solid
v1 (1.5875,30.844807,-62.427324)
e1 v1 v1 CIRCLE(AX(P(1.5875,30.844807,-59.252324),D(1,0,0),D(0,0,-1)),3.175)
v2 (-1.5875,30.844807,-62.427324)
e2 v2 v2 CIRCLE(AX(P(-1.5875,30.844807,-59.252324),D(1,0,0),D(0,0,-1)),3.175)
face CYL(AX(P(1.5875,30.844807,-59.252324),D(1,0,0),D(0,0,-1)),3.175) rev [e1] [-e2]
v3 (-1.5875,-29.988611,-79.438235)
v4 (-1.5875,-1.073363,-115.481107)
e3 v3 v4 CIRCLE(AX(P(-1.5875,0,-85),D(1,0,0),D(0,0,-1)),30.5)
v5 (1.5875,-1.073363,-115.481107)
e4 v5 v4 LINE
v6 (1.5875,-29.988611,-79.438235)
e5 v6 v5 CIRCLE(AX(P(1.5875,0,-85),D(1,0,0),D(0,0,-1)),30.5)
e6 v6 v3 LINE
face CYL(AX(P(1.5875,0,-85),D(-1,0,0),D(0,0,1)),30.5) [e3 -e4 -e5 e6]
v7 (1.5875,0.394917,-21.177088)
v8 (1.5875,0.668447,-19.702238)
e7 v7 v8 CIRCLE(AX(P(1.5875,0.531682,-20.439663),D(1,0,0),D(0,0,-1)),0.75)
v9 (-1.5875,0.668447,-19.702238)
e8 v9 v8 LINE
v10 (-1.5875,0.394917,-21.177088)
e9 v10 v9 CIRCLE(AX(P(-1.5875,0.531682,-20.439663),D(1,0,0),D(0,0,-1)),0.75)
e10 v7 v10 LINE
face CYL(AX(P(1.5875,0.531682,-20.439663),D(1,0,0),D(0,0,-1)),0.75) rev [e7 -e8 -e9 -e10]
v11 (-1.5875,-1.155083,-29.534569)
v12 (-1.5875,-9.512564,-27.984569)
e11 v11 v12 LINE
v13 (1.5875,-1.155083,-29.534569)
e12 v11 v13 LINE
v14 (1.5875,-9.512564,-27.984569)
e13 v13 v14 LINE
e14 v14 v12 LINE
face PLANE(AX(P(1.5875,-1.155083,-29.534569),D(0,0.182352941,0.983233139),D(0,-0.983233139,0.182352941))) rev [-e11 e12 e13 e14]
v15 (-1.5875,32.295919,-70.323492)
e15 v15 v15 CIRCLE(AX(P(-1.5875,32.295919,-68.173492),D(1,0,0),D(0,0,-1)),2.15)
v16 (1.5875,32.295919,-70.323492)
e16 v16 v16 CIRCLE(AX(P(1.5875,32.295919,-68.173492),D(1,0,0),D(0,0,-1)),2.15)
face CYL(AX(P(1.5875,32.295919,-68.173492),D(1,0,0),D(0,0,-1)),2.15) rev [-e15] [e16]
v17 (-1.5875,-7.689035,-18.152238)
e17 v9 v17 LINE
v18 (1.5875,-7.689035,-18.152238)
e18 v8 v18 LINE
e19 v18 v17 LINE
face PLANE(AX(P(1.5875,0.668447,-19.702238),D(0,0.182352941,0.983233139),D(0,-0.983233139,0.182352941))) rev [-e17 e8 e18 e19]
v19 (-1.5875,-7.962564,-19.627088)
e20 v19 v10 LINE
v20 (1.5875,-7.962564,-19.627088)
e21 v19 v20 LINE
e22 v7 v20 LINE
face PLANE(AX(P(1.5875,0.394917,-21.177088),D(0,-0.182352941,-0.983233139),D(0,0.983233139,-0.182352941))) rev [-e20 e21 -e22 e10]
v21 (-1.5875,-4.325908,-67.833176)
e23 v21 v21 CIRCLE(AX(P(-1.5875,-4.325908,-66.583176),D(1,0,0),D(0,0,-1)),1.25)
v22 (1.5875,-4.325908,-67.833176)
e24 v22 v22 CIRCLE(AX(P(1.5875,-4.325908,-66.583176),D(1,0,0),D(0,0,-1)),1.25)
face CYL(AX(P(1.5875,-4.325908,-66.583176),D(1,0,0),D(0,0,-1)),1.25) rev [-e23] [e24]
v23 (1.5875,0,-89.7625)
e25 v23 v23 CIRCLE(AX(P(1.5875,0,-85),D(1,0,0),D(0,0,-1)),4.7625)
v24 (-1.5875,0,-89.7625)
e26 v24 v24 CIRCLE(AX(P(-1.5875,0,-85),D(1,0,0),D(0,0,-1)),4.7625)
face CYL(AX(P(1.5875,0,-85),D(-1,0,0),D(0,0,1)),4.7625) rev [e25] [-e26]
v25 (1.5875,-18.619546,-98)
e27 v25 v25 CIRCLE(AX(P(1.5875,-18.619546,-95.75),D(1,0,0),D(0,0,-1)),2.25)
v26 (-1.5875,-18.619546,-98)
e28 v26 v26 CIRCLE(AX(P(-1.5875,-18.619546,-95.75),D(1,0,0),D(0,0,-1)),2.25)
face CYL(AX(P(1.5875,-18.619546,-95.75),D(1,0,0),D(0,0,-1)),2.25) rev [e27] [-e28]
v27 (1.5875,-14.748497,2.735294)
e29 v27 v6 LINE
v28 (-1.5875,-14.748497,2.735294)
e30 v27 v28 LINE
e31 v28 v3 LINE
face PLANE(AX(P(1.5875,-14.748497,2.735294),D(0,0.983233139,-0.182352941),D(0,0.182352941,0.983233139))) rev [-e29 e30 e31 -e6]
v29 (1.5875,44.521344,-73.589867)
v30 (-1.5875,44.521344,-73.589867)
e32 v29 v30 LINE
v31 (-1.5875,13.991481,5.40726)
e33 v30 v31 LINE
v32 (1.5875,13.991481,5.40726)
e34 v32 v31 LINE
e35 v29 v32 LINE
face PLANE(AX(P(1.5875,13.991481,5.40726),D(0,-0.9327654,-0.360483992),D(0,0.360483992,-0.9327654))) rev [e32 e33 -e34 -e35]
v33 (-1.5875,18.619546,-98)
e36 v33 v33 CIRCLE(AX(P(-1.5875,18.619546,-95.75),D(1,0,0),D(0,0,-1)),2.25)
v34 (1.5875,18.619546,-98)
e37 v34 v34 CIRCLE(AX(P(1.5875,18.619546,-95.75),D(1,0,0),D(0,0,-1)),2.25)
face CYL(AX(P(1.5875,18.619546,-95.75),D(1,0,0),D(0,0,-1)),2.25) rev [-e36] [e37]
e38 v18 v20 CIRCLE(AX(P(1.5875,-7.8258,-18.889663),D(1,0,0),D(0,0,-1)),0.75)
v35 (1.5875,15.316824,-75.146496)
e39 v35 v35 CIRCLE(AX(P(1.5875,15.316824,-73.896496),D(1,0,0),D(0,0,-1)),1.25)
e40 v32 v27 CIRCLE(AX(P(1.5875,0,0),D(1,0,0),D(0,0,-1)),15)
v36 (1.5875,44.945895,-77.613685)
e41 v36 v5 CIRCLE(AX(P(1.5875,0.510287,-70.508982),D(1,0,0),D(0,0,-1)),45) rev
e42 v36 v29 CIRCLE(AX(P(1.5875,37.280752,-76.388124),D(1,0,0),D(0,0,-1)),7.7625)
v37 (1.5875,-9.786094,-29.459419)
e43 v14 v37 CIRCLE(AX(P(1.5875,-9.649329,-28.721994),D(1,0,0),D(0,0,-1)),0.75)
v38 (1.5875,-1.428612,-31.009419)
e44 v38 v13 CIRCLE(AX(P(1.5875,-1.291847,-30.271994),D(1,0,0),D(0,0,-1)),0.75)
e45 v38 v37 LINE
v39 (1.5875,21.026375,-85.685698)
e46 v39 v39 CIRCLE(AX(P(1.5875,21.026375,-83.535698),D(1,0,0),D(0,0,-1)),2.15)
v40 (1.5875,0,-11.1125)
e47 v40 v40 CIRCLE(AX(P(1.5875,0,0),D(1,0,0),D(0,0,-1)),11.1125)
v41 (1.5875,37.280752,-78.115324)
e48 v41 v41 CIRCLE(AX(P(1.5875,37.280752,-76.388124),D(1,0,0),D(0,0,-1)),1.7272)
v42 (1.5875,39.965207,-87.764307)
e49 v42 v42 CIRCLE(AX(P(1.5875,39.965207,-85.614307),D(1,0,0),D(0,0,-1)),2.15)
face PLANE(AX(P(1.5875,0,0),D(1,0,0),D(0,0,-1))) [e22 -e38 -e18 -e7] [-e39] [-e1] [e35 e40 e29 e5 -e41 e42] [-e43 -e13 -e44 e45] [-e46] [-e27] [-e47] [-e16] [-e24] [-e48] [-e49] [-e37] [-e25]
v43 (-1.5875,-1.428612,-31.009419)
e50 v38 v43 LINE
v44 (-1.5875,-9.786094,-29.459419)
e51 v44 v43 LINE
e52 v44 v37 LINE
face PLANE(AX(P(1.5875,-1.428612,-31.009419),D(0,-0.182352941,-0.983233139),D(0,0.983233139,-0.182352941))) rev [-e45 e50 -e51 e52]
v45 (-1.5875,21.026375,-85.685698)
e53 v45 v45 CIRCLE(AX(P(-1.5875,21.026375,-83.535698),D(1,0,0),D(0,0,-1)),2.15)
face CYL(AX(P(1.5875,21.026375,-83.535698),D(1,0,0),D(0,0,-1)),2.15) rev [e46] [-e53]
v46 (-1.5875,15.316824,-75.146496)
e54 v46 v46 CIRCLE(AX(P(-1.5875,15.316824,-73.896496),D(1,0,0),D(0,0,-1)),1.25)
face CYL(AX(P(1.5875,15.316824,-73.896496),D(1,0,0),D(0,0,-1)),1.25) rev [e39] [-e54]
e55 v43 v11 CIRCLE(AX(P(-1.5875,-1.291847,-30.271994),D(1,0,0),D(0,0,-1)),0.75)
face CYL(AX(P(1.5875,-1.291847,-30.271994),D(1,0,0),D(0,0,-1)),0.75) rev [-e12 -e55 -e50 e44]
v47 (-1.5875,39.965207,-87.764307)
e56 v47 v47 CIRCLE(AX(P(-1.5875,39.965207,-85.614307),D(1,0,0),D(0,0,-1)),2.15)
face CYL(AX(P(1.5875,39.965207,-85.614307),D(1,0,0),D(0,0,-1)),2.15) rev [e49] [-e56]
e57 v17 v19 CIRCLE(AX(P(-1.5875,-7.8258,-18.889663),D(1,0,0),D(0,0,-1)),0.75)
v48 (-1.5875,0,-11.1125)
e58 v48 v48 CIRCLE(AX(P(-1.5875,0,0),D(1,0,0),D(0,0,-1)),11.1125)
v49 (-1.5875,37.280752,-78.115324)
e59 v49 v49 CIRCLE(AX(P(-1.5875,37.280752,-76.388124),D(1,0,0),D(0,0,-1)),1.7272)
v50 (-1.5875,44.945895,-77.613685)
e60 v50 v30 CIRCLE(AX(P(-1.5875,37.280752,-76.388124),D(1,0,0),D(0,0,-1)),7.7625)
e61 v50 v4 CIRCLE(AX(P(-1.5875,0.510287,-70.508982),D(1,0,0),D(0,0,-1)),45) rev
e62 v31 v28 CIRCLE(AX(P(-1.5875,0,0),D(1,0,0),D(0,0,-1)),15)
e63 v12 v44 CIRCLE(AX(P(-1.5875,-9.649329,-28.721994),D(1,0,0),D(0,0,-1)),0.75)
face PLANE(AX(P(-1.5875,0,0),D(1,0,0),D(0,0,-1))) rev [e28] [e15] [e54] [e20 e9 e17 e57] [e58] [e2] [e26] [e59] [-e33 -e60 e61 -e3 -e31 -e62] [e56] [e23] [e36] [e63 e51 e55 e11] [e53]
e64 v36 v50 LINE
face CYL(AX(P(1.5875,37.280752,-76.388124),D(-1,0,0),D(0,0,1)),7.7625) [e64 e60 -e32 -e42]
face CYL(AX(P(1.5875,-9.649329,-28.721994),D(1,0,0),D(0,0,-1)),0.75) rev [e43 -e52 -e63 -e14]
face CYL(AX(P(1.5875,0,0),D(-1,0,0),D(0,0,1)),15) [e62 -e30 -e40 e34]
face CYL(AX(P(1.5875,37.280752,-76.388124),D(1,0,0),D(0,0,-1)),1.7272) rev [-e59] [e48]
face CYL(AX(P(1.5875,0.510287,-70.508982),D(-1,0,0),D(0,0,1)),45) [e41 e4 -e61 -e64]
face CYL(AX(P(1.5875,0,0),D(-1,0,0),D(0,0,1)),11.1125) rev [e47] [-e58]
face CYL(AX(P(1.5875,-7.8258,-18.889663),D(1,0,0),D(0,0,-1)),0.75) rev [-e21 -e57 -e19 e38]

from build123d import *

# Parameters (mm, degrees)
SKETCH1_R                  = 11.1125
SKETCH1_R_2                = 4.7625
BOSS_EXTRUDE1_DEPTH        = 1.5875
M3X0_5_TAPPED_HOLE1_D      = 2.5
M4_CLEARANCE_HOLE1_D       = 4.5
F_8_32_TAPPED_HOLE1_D      = 3.4544
F_1_4_0_2500_DOWEL_HOLE1_D = 6.35
F_1_5MM_START              = -1.5875
F_1_5MM_DOWEL_SLOT1_DEPTH  = 3.175
M4_CLEARANCE_HOLE2_D       = 4.3


# Read off the part's stored shape, not the designer's step: Ø1.5mm Dowel Slot1
with BuildPart() as part:
    # Sketch1 → Boss-Extrude1 (new, symmetric)
    with BuildSketch(Plane(origin=(0, 0, 0), x_dir=(0, 0, -1), z_dir=(1, 0, 0))):
        with BuildLine():
            ThreePointArc((77.61368545, 44.94589464), (75.573628084, 45.000402813), (73.589867092, 44.521343816))
            Line((73.589867092, 44.521343816), (-5.407259882, 13.991481))
            ThreePointArc((-5.407259882, 13.991481), (-14.935591096, -1.388567103), (-2.735294118, -14.748497079))
            Line((-2.735294118, -14.748497079), (79.438235294, -29.988610727))
            ThreePointArc((79.438235294, -29.988610727), (104.085761469, -23.790412126), (115.481107121, -1.073363244))
            ThreePointArc((115.481107121, -1.073363244), (105.257248721, 29.103257737), (77.61368545, 44.94589464))
        make_face()
        Circle(SKETCH1_R, mode=Mode.SUBTRACT)
        with Locations((85, 0)):
            Circle(SKETCH1_R_2, mode=Mode.SUBTRACT)
    extrude(amount=BOSS_EXTRUDE1_DEPTH, both=True)

    # M3x0.5 Tapped Hole1 (through all)
    with Locations(Plane(origin=(1.5875, 0, 0), x_dir=(0, 0, -1), z_dir=(1, 0, 0))):
        with Locations((66.583175665, -4.32590816), (73.896496396, 15.316824335)):
            Hole(M3X0_5_TAPPED_HOLE1_D / 2)

    # M4 Clearance Hole1 (through all)
    with Locations(Plane(origin=(1.5875, 0, 0), x_dir=(0, 0, -1), z_dir=(1, 0, 0))):
        with Locations((95.75, 18.619546181), (95.75, -18.619546181)):
            Hole(M4_CLEARANCE_HOLE1_D / 2)

    # #8-32 Tapped Hole1 (through all)
    with Locations(Plane(origin=(1.5875, 0, 0), x_dir=(0, 0, -1), z_dir=(1, 0, 0))):
        with Locations((76.388124081, 37.280752399)):
            Hole(F_8_32_TAPPED_HOLE1_D / 2)

    # 1/4 (0.2500) Dowel Hole1 (through all)
    with Locations(Plane(origin=(1.5875, 0, 0), x_dir=(0, 0, -1), z_dir=(1, 0, 0))):
        with Locations((59.252323656, 30.844807364)):
            Hole(F_1_4_0_2500_DOWEL_HOLE1_D / 2)

    # Ø1.5mm Dowel Slot1 outline → Ø1.5mm Dowel Slot1 (cut)
    with BuildSketch(Plane.YZ.offset(F_1_5MM_START)):
        with BuildLine():
            Line((-1.15508269, -29.534569304), (-9.512564368, -27.984569304))
            ThreePointArc((-9.512564368, -27.984569304), (-10.386753928, -28.585229452), (-9.78609378, -29.459419012))
            Line((-9.78609378, -29.459419012), (-1.428612102, -31.009419012))
            ThreePointArc((-1.428612102, -31.009419012), (-0.554422542, -30.408758864), (-1.15508269, -29.534569304))
        make_face()
        with BuildLine():
            Line((0.668446721, -19.702237918), (-7.689034957, -18.152237918))
            ThreePointArc((-7.689034957, -18.152237918), (-8.563224517, -18.752898066), (-7.962564368, -19.627087626))
            Line((-7.962564368, -19.627087626), (0.39491731, -21.177087626))
            ThreePointArc((0.39491731, -21.177087626), (1.269106869, -20.576427477), (0.668446721, -19.702237918))
        make_face()
    extrude(amount=F_1_5MM_DOWEL_SLOT1_DEPTH, mode=Mode.SUBTRACT)

    # M4 Clearance Hole2 (through all)
    with Locations(Plane(origin=(1.5875, 0, 0), x_dir=(0, 0, -1), z_dir=(1, 0, 0))):
        with Locations((68.173492099, 32.295918862), (85.614306674, 39.965207417), (83.535698104, 21.026374654)):
            Hole(M4_CLEARANCE_HOLE2_D / 2)


solid = part.part
